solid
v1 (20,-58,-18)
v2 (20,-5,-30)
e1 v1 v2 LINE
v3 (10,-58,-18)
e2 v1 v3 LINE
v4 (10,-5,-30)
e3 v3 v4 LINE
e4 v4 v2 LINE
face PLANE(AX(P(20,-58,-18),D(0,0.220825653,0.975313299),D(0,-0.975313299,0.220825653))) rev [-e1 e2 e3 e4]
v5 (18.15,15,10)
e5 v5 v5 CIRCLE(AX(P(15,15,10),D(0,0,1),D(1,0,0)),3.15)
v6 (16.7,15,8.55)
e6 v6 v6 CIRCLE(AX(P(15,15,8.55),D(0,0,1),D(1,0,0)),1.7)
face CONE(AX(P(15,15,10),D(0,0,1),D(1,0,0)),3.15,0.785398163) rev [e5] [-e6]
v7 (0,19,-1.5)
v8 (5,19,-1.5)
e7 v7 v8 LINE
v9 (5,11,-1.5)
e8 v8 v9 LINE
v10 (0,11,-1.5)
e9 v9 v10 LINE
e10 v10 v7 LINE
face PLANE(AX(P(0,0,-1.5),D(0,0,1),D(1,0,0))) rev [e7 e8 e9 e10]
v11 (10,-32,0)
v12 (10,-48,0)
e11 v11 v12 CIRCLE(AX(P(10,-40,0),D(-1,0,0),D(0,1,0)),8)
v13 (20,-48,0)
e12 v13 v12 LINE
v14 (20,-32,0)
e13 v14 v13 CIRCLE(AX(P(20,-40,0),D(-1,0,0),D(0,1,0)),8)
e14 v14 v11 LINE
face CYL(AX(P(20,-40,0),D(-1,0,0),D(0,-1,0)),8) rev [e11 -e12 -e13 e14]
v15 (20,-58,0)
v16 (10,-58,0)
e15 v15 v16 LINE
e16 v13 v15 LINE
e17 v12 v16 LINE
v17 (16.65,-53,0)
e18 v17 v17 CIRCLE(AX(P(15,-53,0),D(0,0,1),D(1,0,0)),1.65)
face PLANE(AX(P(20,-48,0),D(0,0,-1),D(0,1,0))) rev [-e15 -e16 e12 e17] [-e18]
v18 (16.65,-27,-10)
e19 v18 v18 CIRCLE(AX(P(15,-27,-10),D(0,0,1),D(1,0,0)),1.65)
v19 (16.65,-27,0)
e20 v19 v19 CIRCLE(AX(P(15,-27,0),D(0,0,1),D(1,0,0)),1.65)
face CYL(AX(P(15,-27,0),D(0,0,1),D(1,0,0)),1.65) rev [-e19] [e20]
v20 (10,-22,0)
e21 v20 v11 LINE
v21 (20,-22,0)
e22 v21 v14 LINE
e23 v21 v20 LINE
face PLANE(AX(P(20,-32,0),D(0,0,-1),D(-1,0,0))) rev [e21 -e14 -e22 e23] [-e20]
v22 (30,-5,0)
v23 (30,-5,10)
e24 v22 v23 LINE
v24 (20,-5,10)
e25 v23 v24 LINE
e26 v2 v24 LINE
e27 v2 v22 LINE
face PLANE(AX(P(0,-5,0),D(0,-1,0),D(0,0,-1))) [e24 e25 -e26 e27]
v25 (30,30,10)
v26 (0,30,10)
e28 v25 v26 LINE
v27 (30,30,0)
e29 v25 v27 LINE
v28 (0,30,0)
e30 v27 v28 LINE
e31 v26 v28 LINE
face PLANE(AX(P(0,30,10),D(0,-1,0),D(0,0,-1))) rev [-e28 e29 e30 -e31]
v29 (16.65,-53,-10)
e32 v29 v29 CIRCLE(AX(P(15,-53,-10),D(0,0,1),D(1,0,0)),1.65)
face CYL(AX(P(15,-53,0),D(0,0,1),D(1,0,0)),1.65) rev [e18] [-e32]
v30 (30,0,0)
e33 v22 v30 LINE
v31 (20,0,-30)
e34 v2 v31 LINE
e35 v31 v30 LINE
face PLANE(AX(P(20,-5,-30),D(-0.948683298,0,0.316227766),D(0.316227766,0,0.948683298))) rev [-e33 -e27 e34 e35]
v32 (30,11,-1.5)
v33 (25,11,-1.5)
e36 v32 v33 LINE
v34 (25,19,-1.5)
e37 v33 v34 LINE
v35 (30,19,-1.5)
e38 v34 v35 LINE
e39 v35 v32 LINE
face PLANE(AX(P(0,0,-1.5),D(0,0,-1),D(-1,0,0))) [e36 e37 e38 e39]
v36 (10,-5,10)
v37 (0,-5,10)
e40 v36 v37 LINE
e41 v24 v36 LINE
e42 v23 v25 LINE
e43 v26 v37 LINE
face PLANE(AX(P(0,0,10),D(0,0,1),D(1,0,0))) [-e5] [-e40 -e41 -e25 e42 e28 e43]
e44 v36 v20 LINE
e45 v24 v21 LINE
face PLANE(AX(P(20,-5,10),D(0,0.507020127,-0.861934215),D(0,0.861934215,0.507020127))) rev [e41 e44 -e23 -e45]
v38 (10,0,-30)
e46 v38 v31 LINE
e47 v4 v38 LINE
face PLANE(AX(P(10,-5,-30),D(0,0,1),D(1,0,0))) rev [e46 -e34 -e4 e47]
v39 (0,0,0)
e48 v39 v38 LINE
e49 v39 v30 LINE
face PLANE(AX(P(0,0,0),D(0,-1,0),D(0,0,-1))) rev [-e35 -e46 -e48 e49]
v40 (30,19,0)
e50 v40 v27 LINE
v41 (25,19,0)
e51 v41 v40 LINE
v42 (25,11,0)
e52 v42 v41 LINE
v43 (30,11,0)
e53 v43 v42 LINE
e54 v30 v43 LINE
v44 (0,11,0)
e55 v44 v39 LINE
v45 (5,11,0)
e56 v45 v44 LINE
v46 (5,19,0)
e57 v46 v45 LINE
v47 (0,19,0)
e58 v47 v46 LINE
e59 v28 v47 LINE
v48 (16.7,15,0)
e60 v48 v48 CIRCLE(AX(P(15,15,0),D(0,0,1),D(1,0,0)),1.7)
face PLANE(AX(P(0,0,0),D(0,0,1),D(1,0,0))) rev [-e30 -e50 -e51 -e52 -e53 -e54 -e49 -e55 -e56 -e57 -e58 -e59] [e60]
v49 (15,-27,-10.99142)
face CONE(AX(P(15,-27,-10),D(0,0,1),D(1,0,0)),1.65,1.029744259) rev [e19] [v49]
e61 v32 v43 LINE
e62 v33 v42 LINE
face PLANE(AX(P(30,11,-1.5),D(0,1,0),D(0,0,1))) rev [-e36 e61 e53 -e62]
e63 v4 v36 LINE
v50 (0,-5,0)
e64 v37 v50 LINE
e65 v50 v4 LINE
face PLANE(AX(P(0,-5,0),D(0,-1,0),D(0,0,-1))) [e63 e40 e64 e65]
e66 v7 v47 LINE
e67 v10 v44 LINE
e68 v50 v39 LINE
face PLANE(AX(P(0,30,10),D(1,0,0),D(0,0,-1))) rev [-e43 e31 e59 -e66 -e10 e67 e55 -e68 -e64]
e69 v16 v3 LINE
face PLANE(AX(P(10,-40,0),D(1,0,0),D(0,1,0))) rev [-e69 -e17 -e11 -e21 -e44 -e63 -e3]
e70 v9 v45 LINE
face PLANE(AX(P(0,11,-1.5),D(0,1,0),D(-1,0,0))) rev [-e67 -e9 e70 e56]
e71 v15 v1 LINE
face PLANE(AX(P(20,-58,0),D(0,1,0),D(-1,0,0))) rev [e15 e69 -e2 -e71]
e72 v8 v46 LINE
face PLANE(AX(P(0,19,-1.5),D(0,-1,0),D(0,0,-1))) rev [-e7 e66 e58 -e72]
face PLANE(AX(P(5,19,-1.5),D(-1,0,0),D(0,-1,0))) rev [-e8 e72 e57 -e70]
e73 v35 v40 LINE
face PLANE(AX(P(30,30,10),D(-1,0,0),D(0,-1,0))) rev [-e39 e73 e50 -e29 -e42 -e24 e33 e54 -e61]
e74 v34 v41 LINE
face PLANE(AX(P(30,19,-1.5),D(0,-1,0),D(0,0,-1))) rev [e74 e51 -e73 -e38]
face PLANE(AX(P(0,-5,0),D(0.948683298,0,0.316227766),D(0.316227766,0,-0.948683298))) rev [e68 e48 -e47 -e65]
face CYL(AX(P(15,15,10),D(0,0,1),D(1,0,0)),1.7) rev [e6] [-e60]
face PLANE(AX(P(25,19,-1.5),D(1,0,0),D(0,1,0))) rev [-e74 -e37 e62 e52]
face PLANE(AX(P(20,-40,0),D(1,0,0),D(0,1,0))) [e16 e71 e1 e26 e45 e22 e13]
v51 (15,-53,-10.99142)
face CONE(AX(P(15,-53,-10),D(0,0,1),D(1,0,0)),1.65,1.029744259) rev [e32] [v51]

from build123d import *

# Parameters (mm, degrees)
SKETCH_1_W      = 30
SKETCH_1_H      = 30
EXTRUDE_1_DEPTH = 10
EXTRUDE_2_DEPTH = 5
EXTRUDE_3_DEPTH = 5
SKETCH_6_W      = 5
SKETCH_6_H      = 8
EXTRUDE_4_DEPTH = 1.5


# Read off the part's stored shape, not the designer's step: 高级异型孔1, 高级异型孔2
with BuildPart() as part:
    # 草图1 → 凸台-拉伸1 (new body)
    with BuildSketch(Plane.XY):
        with Locations((15, 15)):
            Rectangle(SKETCH_1_W, SKETCH_1_H)
    extrude(amount=EXTRUDE_1_DEPTH)

    # 草图2 → 凸台-拉伸2 (add)
    with BuildSketch(Plane.XZ):
        Polygon((0, 10), (30, 10), (30, 0), (20, -30), (10, -30), (0, 0), align=None)
    extrude(amount=EXTRUDE_2_DEPTH)

    # 草图3 → 凸台-拉伸3 (add, symmetric)
    with BuildSketch(Plane(origin=(15, 0, 0), x_dir=(0, 0, -1), z_dir=(1, 0, 0))):
        with BuildLine():
            Line((0, -48), (0, -58))
            Line((0, -58), (18, -58))
            Line((18, -58), (30, -5))
            Line((30, -5), (-10, -5))
            Line((-10, -5), (0, -22))
            Line((0, -22), (0, -32))
            ThreePointArc((0, -32), (8, -40), (0, -48))
        make_face()
    extrude(amount=EXTRUDE_3_DEPTH, both=True)

    # 草图6 → 凸台-拉伸4 (add, symmetric)
    with BuildSketch(Plane(origin=(0, 0, 0), x_dir=(-1, 0, 0), z_dir=(0, 0, -1))):
        with Locations((-27.5, 15)):
            Rectangle(SKETCH_6_W, SKETCH_6_H)
        with Locations((-2.5, 15)):
            Rectangle(SKETCH_6_W, SKETCH_6_H)
    extrude(amount=EXTRUDE_4_DEPTH, both=True)

    # 高级异型孔1 outline → 高级异型孔1 (revolve, cut)
    with BuildSketch(Plane(origin=(15, 15, 0), x_dir=(1, 0, 0), z_dir=(0, -1, 0))):
        Polygon((3.15, 10), (0, 10), (0, 0), (1.7, 0), (1.7, 8.55), align=None)
    revolve(axis=Axis((15, 15, 0), (0, 0, 1)), mode=Mode.SUBTRACT)

    # 高级异型孔2 outline → 高级异型孔2 (revolve, cut)
    with BuildSketch(Plane(origin=(15, -53, 0), x_dir=(1, 0, 0), z_dir=(0, -1, 0))):
        Polygon((0, -10.991420021), (1.65, -10), (1.65, 0), (0, 0), align=None)
    revolve(axis=Axis((15, -53, 0), (0, 0, 1)), mode=Mode.SUBTRACT)

    # Other 2 2 outline → Other 2 2 (revolve, cut)
    with BuildSketch(Plane(origin=(15, -27, 0), x_dir=(1, 0, 0), z_dir=(0, -1, 0))):
        Polygon((0, -10.991420021), (1.65, -10), (1.65, 0), (0, 0), align=None)
    revolve(axis=Axis((15, -27, 0), (0, 0, 1)), mode=Mode.SUBTRACT)


solid = part.part
